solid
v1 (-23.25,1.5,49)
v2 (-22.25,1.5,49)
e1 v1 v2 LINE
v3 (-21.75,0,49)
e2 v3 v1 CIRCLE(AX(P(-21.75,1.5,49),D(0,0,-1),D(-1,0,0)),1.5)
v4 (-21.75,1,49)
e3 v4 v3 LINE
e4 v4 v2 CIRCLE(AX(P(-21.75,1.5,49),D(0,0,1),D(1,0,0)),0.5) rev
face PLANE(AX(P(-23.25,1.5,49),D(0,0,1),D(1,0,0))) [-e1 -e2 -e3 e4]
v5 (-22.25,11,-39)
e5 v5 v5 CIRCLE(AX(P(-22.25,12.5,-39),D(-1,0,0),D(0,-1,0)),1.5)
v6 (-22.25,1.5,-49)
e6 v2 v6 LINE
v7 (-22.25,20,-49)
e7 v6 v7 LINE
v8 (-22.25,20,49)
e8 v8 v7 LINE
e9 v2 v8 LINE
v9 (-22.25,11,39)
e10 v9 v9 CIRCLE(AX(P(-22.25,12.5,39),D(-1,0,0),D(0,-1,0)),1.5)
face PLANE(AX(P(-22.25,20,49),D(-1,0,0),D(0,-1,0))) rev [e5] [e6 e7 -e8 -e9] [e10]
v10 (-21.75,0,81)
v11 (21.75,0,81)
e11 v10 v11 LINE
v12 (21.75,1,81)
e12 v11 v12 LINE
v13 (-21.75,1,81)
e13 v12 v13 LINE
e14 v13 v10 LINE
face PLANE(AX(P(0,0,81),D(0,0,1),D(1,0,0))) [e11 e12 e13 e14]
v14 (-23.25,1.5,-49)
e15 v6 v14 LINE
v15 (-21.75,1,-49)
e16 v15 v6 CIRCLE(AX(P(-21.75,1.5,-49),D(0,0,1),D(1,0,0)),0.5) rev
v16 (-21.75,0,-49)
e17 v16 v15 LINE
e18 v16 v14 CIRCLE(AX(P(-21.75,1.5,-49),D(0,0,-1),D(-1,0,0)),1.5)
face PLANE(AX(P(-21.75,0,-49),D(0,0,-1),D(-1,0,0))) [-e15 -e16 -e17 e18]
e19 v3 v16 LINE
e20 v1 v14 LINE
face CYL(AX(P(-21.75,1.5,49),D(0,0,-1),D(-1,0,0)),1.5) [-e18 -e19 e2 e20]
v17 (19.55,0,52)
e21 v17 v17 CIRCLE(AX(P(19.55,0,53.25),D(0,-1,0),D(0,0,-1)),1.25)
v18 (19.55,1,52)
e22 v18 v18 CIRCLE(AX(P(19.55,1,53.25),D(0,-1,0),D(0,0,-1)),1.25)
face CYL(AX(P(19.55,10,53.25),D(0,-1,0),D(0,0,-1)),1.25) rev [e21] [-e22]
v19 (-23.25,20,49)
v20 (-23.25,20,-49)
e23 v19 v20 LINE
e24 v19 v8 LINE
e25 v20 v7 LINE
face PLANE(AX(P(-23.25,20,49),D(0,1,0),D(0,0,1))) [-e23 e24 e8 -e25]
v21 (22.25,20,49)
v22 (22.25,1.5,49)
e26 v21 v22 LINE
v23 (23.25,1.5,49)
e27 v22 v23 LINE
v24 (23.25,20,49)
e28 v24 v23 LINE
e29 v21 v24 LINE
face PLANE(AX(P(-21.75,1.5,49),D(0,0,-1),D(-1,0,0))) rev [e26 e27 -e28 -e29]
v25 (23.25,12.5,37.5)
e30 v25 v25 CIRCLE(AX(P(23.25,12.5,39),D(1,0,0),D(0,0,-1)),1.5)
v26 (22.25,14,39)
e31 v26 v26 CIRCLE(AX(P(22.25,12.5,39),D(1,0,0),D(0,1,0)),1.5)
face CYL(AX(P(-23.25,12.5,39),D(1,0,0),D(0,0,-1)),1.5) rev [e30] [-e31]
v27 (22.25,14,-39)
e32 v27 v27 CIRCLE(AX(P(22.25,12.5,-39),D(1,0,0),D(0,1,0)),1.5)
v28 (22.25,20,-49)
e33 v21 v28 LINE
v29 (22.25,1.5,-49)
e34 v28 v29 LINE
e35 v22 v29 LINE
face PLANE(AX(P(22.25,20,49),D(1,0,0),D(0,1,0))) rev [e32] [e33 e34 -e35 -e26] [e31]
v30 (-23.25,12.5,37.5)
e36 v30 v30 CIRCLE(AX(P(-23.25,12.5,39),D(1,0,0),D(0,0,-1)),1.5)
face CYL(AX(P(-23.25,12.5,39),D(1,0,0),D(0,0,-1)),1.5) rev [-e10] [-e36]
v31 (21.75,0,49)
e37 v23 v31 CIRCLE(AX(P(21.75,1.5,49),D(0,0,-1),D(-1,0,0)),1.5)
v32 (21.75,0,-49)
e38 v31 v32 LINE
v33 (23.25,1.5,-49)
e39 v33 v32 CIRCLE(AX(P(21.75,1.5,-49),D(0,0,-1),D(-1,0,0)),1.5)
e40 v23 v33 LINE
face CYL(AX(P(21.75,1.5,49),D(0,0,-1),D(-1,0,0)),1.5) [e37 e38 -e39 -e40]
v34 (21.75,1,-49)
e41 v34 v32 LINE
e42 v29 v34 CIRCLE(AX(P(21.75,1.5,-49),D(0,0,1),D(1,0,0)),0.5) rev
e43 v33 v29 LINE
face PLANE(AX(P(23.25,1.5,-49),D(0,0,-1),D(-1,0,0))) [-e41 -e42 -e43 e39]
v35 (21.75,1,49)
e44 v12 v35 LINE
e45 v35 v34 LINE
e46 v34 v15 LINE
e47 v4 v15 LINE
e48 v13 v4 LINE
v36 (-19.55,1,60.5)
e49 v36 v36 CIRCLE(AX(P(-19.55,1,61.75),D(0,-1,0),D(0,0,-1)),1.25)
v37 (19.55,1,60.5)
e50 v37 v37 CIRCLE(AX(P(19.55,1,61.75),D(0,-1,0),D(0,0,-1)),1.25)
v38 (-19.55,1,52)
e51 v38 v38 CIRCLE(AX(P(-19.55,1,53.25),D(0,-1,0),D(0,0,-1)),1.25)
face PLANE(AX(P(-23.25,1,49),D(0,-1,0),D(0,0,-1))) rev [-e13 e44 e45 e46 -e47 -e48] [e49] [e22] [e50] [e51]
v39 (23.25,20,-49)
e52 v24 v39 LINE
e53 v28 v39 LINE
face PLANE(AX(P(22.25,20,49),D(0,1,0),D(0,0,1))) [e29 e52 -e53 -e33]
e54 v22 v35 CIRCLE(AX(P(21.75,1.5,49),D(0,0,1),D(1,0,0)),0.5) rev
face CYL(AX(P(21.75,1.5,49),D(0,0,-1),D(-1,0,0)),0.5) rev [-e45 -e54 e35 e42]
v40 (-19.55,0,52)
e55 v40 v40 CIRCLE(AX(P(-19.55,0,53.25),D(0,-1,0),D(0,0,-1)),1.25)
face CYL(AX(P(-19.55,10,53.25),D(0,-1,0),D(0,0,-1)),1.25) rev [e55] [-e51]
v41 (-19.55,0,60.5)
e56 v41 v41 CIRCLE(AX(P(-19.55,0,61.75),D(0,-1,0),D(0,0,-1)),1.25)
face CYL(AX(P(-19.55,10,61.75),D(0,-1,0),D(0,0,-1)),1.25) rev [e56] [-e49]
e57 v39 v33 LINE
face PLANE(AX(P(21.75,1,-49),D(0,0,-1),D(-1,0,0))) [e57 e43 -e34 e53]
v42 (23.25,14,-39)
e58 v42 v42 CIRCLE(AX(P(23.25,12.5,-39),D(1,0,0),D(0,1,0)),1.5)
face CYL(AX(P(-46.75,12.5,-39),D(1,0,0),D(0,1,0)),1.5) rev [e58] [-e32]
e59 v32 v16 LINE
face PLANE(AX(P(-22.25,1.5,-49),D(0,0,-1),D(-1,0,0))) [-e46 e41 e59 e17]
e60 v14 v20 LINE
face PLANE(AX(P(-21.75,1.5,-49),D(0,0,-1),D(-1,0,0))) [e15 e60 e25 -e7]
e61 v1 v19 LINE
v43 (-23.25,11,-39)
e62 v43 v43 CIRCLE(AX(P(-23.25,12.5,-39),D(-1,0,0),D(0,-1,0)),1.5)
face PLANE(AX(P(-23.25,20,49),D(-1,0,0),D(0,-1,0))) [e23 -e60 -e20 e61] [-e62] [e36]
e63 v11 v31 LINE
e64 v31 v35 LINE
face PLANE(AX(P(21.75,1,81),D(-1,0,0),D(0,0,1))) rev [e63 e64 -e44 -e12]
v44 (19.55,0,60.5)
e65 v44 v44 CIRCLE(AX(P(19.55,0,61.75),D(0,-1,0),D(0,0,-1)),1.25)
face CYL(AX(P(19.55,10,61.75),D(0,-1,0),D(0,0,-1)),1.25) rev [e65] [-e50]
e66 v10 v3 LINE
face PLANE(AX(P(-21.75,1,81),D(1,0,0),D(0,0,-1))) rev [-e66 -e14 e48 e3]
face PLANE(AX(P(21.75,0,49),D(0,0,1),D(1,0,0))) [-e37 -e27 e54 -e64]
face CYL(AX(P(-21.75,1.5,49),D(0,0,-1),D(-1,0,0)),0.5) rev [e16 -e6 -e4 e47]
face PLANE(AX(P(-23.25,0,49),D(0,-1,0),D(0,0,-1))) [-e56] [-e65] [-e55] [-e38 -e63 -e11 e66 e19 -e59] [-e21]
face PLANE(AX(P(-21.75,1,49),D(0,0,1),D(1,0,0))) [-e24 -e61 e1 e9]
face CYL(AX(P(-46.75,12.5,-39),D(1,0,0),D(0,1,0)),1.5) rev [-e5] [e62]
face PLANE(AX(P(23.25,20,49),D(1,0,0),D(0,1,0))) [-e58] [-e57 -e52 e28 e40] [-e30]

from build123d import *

# Parameters (mm, degrees)
BASE_FLANGE1_DEPTH      = 49
SKETCH8_W               = 43.5
SKETCH8_H               = 1
BOSS_EXTRUDE1_DEPTH     = 32
SKETCH6_R               = 1.25
CUT_EXTRUDE1_DEPTH      = 10
CUT_EXTRUDE3_DEPTH      = 87.611561007
CUT_EXTRUDE3_DEPTH_BACK = 87.611561007
SKETCH9_R               = 1.5
SKETCH7_R               = 1.5
CUT_EXTRUDE2_DEPTH      = 70


# Sheet-metal steps are written as plain solids
with BuildPart() as part:
    # Sketch1 → Base-Flange1 (new, symmetric)
    with BuildSketch(Plane.XY):
        with BuildLine():
            Line((-23.25, 20), (-23.25, 1.5))
            ThreePointArc((-23.25, 1.5), (-22.810660172, 0.439339828), (-21.75, 0))
            Line((-21.75, 0), (21.75, 0))
            ThreePointArc((21.75, 0), (22.810660172, 0.439339828), (23.25, 1.5))
            Line((23.25, 1.5), (23.25, 20))
            Line((23.25, 20), (22.25, 20))
            Line((22.25, 20), (22.25, 1.5))
            ThreePointArc((22.25, 1.5), (22.103553391, 1.146446609), (21.75, 1))
            Line((21.75, 1), (-21.75, 1))
            ThreePointArc((-21.75, 1), (-22.103553391, 1.146446609), (-22.25, 1.5))
            Line((-22.25, 1.5), (-22.25, 20))
            Line((-22.25, 20), (-23.25, 20))
        make_face()
    extrude(amount=BASE_FLANGE1_DEPTH, both=True)

    # Sketch8 → Boss-Extrude1 (add)
    with BuildSketch(Plane.XY.offset(49)):
        with Locations((0, 0.5)):
            Rectangle(SKETCH8_W, SKETCH8_H)
    extrude(amount=BOSS_EXTRUDE1_DEPTH)

    # Sketch6 → Cut-Extrude1 (cut)
    with BuildSketch(Plane.XZ):
        with Locations(Location((19.55, 53.25, 0), (0, 0, 270))):
            Circle(SKETCH6_R)
        with Locations(Location((19.55, 61.75, 0), (0, 0, 270))):
            Circle(SKETCH6_R)
        with Locations(Location((-19.55, 53.25, 0), (0, 0, 270))):
            Circle(SKETCH6_R)
        with Locations(Location((-19.55, 61.75, 0), (0, 0, 270))):
            Circle(SKETCH6_R)
    extrude(amount=-CUT_EXTRUDE1_DEPTH, mode=Mode.SUBTRACT)

    # Sketch9 → Cut-Extrude3 (cut, two sides: drawn at the far end of the back side and taken through both)
    with BuildSketch(Plane(origin=(0, 0, 0), x_dir=(0, 0, -1), z_dir=(1, 0, 0)).offset(-CUT_EXTRUDE3_DEPTH_BACK)):
        with Locations((-39, 12.5)):
            Circle(SKETCH9_R)
    extrude(amount=CUT_EXTRUDE3_DEPTH + CUT_EXTRUDE3_DEPTH_BACK, mode=Mode.SUBTRACT)

    # Sketch7 → Cut-Extrude2 (cut)
    with BuildSketch(Plane(origin=(23.25, 0, 0), x_dir=(0, 0, -1), z_dir=(1, 0, 0))):
        with Locations(Location((39, 12.5, 0), (0, 0, 90))):
            Circle(SKETCH7_R)
    extrude(amount=-CUT_EXTRUDE2_DEPTH, mode=Mode.SUBTRACT)


solid = part.part
